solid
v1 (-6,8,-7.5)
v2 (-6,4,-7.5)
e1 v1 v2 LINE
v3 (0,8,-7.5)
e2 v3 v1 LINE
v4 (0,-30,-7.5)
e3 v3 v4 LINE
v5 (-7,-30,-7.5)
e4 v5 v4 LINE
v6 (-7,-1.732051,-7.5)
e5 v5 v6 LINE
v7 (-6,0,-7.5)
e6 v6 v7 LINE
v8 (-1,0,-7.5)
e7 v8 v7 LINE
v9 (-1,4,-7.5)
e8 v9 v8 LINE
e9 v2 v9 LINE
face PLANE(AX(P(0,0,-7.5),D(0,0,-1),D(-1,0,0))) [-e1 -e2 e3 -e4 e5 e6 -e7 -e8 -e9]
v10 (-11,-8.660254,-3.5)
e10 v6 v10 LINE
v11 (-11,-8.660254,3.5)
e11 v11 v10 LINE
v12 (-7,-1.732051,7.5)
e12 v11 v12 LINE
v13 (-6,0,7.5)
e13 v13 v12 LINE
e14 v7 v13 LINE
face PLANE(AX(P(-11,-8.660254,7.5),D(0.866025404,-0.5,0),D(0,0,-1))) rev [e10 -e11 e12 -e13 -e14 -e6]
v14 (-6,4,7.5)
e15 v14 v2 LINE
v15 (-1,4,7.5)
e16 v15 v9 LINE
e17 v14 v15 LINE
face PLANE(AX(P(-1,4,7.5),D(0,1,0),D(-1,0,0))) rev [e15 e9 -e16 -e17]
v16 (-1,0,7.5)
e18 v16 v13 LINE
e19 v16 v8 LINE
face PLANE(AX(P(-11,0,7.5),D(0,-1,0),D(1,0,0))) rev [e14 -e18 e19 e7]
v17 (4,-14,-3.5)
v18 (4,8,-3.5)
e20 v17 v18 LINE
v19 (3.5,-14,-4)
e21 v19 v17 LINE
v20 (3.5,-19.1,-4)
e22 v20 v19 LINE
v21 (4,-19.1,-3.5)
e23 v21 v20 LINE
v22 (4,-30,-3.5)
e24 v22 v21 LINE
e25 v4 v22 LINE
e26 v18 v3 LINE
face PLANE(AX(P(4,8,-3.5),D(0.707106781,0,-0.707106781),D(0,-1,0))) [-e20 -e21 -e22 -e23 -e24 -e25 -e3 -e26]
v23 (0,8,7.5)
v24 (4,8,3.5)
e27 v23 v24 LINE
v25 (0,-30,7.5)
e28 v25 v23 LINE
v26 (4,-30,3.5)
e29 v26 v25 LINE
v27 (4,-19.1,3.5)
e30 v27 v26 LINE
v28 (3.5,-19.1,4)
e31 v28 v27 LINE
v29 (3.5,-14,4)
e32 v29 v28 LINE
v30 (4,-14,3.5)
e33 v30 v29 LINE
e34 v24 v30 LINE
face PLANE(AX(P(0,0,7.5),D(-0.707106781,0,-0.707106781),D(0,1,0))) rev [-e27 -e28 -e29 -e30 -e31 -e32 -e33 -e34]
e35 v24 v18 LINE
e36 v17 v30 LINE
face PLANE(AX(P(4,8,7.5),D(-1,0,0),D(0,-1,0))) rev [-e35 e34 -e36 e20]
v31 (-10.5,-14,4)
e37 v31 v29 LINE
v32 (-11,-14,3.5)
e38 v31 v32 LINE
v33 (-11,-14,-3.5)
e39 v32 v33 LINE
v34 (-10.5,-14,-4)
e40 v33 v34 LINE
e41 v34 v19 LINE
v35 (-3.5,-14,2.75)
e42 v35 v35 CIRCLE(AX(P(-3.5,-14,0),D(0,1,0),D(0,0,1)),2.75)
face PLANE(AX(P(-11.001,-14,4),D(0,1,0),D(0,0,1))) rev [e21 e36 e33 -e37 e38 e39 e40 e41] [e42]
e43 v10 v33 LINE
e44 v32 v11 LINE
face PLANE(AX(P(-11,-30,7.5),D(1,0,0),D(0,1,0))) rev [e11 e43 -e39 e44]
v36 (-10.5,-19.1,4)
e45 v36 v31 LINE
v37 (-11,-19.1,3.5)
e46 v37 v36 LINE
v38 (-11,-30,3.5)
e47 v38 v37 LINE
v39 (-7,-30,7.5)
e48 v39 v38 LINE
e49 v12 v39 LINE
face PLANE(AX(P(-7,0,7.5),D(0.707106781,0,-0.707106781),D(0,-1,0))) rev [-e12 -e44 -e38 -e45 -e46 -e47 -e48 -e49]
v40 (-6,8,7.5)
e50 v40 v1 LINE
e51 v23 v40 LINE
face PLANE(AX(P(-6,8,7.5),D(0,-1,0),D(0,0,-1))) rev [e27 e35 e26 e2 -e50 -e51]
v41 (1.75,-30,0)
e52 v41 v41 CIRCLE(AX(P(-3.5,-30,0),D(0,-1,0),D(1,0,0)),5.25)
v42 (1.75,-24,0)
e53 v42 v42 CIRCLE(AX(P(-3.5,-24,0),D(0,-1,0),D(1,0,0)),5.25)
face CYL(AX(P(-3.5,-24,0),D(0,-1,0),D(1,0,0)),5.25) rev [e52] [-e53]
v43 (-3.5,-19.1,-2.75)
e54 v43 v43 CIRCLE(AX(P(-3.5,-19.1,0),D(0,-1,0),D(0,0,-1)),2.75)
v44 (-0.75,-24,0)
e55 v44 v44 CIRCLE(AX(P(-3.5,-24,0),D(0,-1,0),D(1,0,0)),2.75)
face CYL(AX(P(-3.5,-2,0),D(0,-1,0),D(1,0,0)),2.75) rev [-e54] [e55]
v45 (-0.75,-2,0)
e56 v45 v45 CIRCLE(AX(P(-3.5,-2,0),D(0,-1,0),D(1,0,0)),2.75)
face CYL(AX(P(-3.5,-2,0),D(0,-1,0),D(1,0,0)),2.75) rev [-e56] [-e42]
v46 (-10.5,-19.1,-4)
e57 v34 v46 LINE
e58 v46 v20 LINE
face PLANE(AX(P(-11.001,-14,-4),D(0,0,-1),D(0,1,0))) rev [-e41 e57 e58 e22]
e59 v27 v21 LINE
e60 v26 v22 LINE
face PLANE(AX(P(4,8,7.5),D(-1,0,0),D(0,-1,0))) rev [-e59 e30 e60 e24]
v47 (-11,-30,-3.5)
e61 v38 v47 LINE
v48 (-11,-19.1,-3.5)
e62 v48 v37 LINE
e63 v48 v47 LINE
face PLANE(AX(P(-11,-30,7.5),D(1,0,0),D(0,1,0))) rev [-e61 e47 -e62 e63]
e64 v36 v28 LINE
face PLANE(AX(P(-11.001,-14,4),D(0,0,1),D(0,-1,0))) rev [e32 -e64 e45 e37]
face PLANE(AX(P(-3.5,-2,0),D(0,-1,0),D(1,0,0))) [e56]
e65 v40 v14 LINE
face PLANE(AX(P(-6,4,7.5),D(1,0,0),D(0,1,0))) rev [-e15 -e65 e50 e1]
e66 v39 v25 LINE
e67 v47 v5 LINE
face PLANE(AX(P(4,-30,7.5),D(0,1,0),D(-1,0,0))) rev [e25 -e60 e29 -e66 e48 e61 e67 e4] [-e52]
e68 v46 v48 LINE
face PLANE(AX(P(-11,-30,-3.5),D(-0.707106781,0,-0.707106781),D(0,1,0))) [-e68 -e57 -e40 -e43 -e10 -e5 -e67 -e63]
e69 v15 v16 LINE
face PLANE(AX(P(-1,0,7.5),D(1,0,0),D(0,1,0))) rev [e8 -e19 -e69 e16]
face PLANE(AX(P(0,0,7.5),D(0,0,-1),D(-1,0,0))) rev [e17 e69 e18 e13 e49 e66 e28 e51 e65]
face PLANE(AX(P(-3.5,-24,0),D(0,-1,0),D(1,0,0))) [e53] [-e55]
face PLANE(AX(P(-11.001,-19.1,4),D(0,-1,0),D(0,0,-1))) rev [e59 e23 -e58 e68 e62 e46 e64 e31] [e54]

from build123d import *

# Parameters (mm, degrees)
BOSS_EXTRUDE1_DEPTH = 7.5
SKETCH2_R           = 5.25
CUT_EXTRUDE1_DEPTH  = 6
SKETCH4_R           = 2.75
CUT_EXTRUDE3_DEPTH  = 28
CUT_EXTRUDE4_REACH  = 36.369
SKETCH5_W           = 8
SKETCH5_H           = 5.1
CHAMFER2_SIZE       = 5
CHAMFER2_SIZE2      = 8.660254038
CHAMFER3_SIZE       = 4


with BuildPart() as part:
    # Sketch1 → Boss-Extrude1 (new, symmetric)
    with BuildSketch(Plane.XY):
        Polygon((-6, 8), (4, 8), (4, -30), (-11, -30), (-11, 0), (-1, 0), (-1, 4), (-6, 4), align=None)
    extrude(amount=BOSS_EXTRUDE1_DEPTH, both=True)

    # Sketch2 → Cut-Extrude1 (cut)
    with BuildSketch(Plane.XZ.offset(30)):
        with Locations((-3.5, 0)):
            Circle(SKETCH2_R)
    extrude(amount=-CUT_EXTRUDE1_DEPTH, mode=Mode.SUBTRACT)

    # Sketch4 → Cut-Extrude3 (cut)
    with BuildSketch(Plane.XZ.offset(30)):
        with Locations((-3.5, 0)):
            Circle(SKETCH4_R)
    extrude(amount=-CUT_EXTRUDE3_DEPTH, mode=Mode.SUBTRACT)

    # Sketch5 → Cut-Extrude4 (cut, up to next)
    with BuildSketch(Plane(origin=(4, 0, 0), x_dir=(0, 0, -1), z_dir=(1, 0, 0)), mode=Mode.PRIVATE) as cut_extrude4_sk1:
        with Locations((0, -16.55)):
            Rectangle(SKETCH5_W, SKETCH5_H)
    cut_extrude4_tool1 = extrude(cut_extrude4_sk1.sketch, amount=-CUT_EXTRUDE4_REACH, mode=Mode.PRIVATE) & part.part
    add(cut_extrude4_tool1.solids().sort_by_distance((4, -16.55, 0))[0], mode=Mode.SUBTRACT)

    # Chamfer2
    chamfer2_edges = [part.edges().sort_by_distance(p)[0] for p in [
        (-11, 0, 0),
    ]]
    chamfer2_side = [part.faces().sort_by_distance(p)[0] for p in [
        (-6, 0, 0),
    ]]
    chamfer(chamfer2_edges, length=CHAMFER2_SIZE, length2=CHAMFER2_SIZE2, reference=chamfer2_side[0])

    # Chamfer3
    # the kernel refuses this chamfer: 4 mm, written as the material it takes off along each edge
    with BuildSketch(Plane(origin=(-11, -40.286731952, 7.5), x_dir=(-0.027495876610586487, 0, -0.9996219169112968), z_dir=(0, 1, 0)), Plane(origin=(-11, -40.286731952, -7.5), x_dir=(0.9996219169112968, 0, -0.027495876610586275), z_dir=(0, 1, 0))) as chamfer3_piece_1:
        Polygon((CHAMFER3_SIZE * 0.999621916911, -CHAMFER3_SIZE * 0.0274958766106), (-CHAMFER3_SIZE * 0.0274958766106, -CHAMFER3_SIZE * 0.999621916911), (0, 0), align=None)
    extrude(amount=41.913209866, mode=Mode.SUBTRACT)
    with BuildSketch(Plane(origin=(4, 18.286731952, -7.5), x_dir=(-0.9996219169112968, 0, -0.027495876610586275), z_dir=(0, -1, 0)), Plane(origin=(4, 18.286731952, 7.5), x_dir=(0.02749587661058638, 0, -0.9996219169112968), z_dir=(0, -1, 0))) as chamfer3_piece_2:
        Polygon((CHAMFER3_SIZE * 0.999621916911, -CHAMFER3_SIZE * 0.0274958766106), (-CHAMFER3_SIZE * 0.0274958766106, -CHAMFER3_SIZE * 0.999621916911), (0, 0), align=None)
    extrude(amount=58.573463904, mode=Mode.SUBTRACT)


solid = part.part
